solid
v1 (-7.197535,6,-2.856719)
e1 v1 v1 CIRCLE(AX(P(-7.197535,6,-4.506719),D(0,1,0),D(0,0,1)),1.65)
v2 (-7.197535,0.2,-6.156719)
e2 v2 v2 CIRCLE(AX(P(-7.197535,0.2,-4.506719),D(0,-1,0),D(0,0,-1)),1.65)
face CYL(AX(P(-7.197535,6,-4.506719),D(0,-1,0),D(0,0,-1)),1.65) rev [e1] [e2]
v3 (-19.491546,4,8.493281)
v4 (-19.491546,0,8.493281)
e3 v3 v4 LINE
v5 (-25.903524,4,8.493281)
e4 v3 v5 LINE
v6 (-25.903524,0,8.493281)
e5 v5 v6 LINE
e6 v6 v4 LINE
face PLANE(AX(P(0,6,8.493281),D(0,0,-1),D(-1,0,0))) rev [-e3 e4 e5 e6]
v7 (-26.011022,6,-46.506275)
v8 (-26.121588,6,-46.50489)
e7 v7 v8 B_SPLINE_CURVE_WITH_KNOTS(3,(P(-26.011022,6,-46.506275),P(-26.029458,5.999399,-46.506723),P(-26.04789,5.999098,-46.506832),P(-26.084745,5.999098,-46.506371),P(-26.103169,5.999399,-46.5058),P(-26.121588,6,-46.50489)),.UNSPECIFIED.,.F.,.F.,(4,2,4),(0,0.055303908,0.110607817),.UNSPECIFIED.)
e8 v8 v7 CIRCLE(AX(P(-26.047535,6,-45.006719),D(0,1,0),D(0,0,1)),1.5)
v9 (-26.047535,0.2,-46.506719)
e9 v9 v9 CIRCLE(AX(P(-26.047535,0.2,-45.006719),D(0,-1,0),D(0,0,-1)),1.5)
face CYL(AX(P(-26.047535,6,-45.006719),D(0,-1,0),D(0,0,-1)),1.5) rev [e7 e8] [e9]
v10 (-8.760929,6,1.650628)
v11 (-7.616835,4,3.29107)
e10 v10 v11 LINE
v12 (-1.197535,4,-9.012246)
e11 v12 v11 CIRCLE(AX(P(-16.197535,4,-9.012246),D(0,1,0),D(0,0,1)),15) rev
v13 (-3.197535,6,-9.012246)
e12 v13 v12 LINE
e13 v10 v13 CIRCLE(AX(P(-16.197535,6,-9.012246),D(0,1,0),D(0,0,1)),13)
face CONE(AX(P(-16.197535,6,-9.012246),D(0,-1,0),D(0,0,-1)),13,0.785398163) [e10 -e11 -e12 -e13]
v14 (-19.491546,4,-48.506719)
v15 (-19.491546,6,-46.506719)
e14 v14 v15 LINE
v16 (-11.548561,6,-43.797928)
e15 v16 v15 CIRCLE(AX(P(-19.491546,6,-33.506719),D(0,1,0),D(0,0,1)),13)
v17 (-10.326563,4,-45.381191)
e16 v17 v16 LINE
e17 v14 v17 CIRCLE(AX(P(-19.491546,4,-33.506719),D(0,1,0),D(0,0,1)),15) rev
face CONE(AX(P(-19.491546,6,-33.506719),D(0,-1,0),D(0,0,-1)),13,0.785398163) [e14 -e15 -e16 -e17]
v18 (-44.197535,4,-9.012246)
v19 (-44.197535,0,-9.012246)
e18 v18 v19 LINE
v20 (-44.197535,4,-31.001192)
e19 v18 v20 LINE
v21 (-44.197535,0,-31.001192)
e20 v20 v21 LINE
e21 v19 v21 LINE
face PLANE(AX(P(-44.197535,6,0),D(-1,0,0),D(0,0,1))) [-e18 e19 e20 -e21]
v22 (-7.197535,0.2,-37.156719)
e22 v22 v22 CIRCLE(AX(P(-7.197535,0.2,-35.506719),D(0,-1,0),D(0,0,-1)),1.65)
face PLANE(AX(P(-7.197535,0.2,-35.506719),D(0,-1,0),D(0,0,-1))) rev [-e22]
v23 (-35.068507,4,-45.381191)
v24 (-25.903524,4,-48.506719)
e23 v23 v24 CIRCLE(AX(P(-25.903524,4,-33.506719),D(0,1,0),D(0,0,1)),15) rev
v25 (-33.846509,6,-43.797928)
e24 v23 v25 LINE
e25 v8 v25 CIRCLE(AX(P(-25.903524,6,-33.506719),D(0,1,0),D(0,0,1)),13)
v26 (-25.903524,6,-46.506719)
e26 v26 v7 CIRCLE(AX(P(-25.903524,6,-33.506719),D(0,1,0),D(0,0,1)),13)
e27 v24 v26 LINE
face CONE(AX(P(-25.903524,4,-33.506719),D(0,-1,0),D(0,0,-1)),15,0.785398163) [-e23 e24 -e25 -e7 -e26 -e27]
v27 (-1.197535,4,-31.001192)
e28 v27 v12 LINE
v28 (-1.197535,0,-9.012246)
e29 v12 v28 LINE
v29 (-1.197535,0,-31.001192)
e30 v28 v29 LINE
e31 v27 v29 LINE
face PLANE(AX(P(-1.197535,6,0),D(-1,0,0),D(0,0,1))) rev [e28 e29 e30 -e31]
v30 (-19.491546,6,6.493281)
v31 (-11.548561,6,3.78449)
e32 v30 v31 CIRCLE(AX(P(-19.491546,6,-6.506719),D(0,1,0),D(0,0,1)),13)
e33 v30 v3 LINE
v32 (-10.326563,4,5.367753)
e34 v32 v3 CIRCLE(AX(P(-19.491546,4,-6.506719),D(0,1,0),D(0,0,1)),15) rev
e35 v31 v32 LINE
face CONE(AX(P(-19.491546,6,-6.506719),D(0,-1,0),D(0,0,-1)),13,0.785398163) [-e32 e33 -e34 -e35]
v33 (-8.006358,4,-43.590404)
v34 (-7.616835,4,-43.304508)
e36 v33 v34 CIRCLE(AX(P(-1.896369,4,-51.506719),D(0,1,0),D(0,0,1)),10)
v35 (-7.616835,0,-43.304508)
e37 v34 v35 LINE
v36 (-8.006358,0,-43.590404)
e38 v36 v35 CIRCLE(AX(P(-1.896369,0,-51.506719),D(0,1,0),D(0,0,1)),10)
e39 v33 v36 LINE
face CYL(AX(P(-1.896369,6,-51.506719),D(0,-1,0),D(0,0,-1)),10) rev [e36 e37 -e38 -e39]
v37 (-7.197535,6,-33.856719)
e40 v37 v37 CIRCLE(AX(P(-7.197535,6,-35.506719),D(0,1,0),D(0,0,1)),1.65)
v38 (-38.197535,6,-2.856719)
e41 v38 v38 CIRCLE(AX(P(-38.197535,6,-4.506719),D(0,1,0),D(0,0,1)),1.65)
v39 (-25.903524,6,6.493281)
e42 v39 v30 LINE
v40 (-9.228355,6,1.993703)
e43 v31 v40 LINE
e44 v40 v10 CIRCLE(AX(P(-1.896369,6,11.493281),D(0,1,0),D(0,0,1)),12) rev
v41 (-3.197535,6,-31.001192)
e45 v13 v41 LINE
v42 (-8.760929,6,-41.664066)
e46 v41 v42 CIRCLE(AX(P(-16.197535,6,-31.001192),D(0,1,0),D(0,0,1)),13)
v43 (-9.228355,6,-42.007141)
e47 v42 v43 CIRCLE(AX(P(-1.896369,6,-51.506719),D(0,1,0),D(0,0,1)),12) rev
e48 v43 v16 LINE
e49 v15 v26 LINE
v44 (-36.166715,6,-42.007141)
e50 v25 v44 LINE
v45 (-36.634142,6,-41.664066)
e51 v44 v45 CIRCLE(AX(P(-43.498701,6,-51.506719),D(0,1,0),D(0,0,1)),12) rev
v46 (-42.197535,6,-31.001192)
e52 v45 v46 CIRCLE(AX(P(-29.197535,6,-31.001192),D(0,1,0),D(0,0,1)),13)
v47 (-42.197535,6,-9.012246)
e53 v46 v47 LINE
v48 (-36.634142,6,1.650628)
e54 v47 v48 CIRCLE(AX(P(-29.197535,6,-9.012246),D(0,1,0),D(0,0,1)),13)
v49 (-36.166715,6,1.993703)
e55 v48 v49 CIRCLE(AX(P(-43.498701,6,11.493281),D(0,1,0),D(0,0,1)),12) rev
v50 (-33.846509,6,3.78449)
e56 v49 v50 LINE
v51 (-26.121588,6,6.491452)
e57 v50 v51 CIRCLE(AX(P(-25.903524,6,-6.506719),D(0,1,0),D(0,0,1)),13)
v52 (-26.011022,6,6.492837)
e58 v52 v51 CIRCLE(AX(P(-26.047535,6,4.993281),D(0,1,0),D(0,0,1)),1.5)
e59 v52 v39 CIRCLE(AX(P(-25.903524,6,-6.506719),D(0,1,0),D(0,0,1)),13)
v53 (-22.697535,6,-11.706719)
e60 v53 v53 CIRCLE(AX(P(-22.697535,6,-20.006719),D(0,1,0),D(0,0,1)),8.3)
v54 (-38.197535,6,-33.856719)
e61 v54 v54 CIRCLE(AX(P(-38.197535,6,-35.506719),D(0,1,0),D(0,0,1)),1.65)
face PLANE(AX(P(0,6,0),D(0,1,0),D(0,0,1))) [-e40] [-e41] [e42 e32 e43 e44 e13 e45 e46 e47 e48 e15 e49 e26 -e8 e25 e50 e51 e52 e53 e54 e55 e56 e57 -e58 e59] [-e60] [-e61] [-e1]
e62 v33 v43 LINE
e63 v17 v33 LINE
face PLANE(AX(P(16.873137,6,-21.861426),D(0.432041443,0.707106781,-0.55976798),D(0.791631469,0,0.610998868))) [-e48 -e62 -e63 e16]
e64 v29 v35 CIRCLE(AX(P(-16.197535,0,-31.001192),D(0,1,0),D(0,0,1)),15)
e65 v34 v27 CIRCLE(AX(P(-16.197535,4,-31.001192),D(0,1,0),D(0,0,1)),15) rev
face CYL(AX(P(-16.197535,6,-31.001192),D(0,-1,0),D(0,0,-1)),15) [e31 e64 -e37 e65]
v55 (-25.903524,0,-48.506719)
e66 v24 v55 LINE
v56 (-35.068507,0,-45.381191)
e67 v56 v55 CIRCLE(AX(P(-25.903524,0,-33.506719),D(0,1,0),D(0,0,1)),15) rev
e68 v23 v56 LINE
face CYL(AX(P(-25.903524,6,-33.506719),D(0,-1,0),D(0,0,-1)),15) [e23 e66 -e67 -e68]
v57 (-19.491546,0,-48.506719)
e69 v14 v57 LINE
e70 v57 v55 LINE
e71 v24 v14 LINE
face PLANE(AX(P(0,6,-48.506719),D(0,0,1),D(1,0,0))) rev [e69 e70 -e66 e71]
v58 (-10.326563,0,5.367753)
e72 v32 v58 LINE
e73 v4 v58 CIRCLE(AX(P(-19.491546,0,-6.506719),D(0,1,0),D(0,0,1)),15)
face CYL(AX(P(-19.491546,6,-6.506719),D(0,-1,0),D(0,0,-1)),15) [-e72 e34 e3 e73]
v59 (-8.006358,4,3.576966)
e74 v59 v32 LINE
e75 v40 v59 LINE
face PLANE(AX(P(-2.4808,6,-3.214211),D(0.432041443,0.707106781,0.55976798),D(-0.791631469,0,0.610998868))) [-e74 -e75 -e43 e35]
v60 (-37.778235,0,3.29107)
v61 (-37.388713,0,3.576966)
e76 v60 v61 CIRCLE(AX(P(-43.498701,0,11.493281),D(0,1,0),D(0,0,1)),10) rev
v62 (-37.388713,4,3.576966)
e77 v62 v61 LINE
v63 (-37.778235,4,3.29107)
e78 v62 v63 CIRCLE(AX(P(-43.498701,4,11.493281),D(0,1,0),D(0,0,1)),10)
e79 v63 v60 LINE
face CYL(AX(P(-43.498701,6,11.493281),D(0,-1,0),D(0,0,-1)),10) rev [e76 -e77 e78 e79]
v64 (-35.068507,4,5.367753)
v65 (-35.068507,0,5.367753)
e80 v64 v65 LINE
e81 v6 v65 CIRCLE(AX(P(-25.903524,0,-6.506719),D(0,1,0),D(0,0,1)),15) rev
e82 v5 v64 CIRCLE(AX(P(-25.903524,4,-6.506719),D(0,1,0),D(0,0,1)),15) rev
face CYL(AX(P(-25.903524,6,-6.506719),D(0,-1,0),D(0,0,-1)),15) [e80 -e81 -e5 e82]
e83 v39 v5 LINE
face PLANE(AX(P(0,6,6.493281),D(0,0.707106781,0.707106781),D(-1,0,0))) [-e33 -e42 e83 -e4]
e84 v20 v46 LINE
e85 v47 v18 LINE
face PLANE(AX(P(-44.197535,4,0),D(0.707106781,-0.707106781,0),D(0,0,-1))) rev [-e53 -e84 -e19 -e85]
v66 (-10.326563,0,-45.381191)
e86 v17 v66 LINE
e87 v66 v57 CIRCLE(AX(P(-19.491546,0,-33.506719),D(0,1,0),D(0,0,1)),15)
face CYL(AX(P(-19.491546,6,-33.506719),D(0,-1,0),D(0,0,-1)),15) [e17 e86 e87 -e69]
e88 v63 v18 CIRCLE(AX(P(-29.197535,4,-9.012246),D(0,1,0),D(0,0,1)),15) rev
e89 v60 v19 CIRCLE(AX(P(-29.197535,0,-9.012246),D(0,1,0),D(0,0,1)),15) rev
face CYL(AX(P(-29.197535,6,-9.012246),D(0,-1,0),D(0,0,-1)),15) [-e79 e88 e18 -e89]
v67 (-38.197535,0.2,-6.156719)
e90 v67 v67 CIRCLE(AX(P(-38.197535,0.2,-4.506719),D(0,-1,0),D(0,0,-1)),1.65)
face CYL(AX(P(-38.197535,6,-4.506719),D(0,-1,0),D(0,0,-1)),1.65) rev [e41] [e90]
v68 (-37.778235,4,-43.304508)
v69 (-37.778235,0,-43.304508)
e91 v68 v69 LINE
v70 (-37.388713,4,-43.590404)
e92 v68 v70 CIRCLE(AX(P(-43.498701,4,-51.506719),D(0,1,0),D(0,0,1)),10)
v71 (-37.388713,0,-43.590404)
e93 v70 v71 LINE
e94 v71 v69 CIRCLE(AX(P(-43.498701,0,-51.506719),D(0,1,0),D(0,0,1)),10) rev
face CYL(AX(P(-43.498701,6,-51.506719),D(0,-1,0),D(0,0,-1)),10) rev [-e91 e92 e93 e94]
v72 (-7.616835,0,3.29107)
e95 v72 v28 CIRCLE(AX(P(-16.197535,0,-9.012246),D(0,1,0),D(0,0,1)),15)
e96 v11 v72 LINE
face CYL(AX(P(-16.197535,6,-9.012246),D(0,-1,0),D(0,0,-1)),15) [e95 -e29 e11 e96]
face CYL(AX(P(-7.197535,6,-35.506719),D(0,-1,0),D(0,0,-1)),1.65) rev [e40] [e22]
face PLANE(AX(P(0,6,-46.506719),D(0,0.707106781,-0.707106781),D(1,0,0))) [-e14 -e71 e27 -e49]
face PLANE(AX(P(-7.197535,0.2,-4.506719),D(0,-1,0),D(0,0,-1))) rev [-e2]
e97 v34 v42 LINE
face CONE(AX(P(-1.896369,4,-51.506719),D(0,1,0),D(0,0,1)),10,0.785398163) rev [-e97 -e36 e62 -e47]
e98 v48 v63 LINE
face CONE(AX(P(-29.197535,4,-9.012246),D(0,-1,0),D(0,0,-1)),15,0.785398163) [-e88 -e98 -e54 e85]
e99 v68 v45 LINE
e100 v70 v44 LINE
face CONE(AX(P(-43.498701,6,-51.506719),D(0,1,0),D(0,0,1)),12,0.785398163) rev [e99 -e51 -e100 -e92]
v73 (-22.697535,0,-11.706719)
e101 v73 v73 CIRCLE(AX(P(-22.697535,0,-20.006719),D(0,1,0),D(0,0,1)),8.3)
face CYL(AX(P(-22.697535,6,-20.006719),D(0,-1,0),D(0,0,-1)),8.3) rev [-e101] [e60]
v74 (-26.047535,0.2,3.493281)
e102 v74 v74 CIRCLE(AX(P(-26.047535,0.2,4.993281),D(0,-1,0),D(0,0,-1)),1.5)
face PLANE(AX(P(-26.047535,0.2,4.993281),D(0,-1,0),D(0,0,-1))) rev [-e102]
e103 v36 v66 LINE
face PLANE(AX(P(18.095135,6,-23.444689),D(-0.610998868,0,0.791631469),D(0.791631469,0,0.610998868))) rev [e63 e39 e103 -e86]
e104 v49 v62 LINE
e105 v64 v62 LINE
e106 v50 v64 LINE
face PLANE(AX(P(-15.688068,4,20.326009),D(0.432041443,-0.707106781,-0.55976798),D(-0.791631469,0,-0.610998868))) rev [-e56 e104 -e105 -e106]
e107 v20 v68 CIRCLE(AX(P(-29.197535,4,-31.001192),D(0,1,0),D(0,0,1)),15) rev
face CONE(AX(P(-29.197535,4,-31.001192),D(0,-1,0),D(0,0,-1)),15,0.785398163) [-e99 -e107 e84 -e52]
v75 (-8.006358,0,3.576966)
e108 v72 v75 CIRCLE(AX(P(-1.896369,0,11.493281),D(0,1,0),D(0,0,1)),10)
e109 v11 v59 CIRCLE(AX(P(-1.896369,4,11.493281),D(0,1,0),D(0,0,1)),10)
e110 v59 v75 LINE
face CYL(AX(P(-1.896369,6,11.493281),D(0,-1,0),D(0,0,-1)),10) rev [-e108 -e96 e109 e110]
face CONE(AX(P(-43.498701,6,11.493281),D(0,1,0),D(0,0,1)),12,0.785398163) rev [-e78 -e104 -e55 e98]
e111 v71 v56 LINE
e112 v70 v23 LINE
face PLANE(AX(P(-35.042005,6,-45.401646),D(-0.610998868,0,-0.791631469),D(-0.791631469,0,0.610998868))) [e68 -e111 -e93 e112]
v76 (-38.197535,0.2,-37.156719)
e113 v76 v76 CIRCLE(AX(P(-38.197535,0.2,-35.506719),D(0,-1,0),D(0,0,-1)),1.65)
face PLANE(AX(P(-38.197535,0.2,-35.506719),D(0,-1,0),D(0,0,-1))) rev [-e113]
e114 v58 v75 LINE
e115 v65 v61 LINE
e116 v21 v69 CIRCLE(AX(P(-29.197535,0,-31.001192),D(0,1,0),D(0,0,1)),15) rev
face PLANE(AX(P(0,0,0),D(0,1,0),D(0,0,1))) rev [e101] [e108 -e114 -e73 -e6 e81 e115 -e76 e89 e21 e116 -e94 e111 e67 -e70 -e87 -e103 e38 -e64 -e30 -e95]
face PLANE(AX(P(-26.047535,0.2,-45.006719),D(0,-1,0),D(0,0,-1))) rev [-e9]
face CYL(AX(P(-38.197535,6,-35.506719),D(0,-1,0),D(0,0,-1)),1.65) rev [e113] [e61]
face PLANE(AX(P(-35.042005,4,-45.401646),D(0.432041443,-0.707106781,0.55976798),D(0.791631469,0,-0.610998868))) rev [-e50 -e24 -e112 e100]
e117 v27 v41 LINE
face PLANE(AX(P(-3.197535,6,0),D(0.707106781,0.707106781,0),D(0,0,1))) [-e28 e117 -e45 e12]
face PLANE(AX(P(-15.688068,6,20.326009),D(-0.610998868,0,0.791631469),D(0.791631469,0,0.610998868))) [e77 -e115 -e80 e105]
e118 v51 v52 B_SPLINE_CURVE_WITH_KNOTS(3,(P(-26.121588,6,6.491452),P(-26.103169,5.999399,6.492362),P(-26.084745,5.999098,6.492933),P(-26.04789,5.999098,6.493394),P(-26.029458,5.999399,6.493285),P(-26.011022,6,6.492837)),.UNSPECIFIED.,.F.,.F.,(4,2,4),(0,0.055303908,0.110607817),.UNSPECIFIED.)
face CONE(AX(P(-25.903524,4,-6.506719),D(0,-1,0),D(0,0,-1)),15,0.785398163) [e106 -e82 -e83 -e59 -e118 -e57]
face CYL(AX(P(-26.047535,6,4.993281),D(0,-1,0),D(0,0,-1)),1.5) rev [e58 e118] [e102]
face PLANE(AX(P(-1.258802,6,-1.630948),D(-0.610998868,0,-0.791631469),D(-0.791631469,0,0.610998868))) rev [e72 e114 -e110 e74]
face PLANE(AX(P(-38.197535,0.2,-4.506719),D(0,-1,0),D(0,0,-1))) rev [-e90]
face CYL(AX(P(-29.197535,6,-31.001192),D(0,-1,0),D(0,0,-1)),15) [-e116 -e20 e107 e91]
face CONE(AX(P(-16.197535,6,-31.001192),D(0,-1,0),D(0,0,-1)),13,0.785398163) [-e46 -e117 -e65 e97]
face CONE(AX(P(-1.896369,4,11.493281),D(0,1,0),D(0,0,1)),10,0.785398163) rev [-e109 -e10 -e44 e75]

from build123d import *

# Parameters (mm, degrees)
SZKIC1_R                    = 1.65
SZKIC1_R_2                  = 1.5
SZKIC1_R_3                  = 8.3
DODANIE_WYCI_GNI_CIE1_DEPTH = 6
SFAZOWANIE1_SIZE            = 2
SZKIC2_R                    = 1.65
SZKIC2_R_2                  = 1.5
DODANIE_WYCI_GNI_CIE2_DEPTH = 0.2


with BuildPart() as part:
    # Szkic1 → Dodanie-wyciągnięcie1 (new body)
    with BuildSketch(Plane(origin=(0, 0, 0), x_dir=(1, 0, 0), z_dir=(0, 1, 0))):
        with BuildLine():
            Line((-25.903523773, -8.493281025), (-19.491546416, -8.493281025))
            ThreePointArc((-19.491546416, -8.493281025), (-14.649908292, -7.690412435), (-10.326563391, -5.367753061))
            Line((-10.326563391, -5.367753061), (-8.006357575, -3.576966334))
            ThreePointArc((-8.006357575, -3.576966334), (-7.813323472, -3.431665275), (-7.616835373, -3.29107015))
            ThreePointArc((-7.616835373, -3.29107015), (-2.898841628, 2.073604214), (-1.197535095, 9.012246163))
            Line((-1.197535095, 9.012246163), (-1.197535095, 31.001191788))
            ThreePointArc((-1.197535095, 31.001191788), (-2.898841628, 37.939833736), (-7.616835373, 43.3045081))
            ThreePointArc((-7.616835373, 43.3045081), (-7.813323472, 43.445103226), (-8.006357575, 43.590404284))
            Line((-8.006357575, 43.590404284), (-10.326563391, 45.381191012))
            ThreePointArc((-10.326563391, 45.381191012), (-14.649908292, 47.703850385), (-19.491546416, 48.506718975))
            Line((-19.491546416, 48.506718975), (-25.903523773, 48.506718975))
            ThreePointArc((-25.903523773, 48.506718975), (-30.745161897, 47.703850385), (-35.068506799, 45.381191012))
            Line((-35.068506799, 45.381191012), (-37.388712614, 43.590404284))
            ThreePointArc((-37.388712614, 43.590404284), (-37.581746717, 43.445103226), (-37.778234817, 43.3045081))
            ThreePointArc((-37.778234817, 43.3045081), (-42.496228561, 37.939833736), (-44.197535095, 31.001191788))
            Line((-44.197535095, 31.001191788), (-44.197535095, 9.012246163))
            ThreePointArc((-44.197535095, 9.012246163), (-42.496228561, 2.073604214), (-37.778234817, -3.29107015))
            ThreePointArc((-37.778234817, -3.29107015), (-37.581746717, -3.431665275), (-37.388712614, -3.576966334))
            Line((-37.388712614, -3.576966334), (-35.068506799, -5.367753061))
            ThreePointArc((-35.068506799, -5.367753061), (-30.745161897, -7.690412435), (-25.903523773, -8.493281025))
        make_face()
        with Locations(Location((-38.197535095, 35.506718975, 0), (0, 0, 270))):
            Circle(SZKIC1_R, mode=Mode.SUBTRACT)
        with Locations(Location((-26.047535095, 45.006718975, 0), (0, 0, 270))):
            Circle(SZKIC1_R_2, mode=Mode.SUBTRACT)
        with Locations(Location((-7.197535095, 35.506718975, 0), (0, 0, 270))):
            Circle(SZKIC1_R, mode=Mode.SUBTRACT)
        with Locations(Location((-38.197535095, 4.506718975, 0), (0, 0, 270))):
            Circle(SZKIC1_R, mode=Mode.SUBTRACT)
        with Locations(Location((-26.047535095, -4.993281025, 0), (0, 0, 270))):
            Circle(SZKIC1_R_2, mode=Mode.SUBTRACT)
        with Locations(Location((-7.197535095, 4.506718975, 0), (0, 0, 270))):
            Circle(SZKIC1_R, mode=Mode.SUBTRACT)
        with Locations(Location((-22.697535095, 20.006718975, 0), (0, 0, 270))):
            Circle(SZKIC1_R_3, mode=Mode.SUBTRACT)
    extrude(amount=DODANIE_WYCI_GNI_CIE1_DEPTH)

    # Sfazowanie1
    # the kernel refuses this chamfer: 2 mm, written as the material it takes off along each edge
    with BuildSketch(Plane(origin=(-19.491546416, 6, -33.506718975), x_dir=(0.6109988683682814, 0, -0.791631469089424), z_dir=(0.791631469089424, 0, 0.6109988683682814))) as sfazowanie1_piece_1:
        Polygon((15, -SFAZOWANIE1_SIZE), (15 - SFAZOWANIE1_SIZE, 0), (15, 0), align=None)
    revolve(axis=Axis((-19.491546416, 6, -33.506718975), (0, 1, 0)), revolution_arc=37.661762745, mode=Mode.SUBTRACT)
    with BuildSketch(Plane(origin=(-19.491546416, 6, -48.506718975), x_dir=(0, -0.9996219169112968, -0.02749587661058563), z_dir=(-1, 0, 0)), Plane(origin=(-25.903523773, 6, 8.493281025), x_dir=(0, -0.9996219169112968, 0.027495876610586487), z_dir=(1, 0, 0))) as sfazowanie1_piece_2:
        Polygon((SFAZOWANIE1_SIZE * 0.999621916911, SFAZOWANIE1_SIZE * 0.0274958766106), (-SFAZOWANIE1_SIZE * 0.0274958766106, SFAZOWANIE1_SIZE * 0.999621916911), (0, 0), align=None)
    extrude(amount=6.411977357, mode=Mode.SUBTRACT)
    with BuildSketch(Plane(origin=(-25.903523773, 6, -33.506718975), x_dir=(0, 0, -1), z_dir=(1, 0, 0))) as sfazowanie1_piece_3:
        Polygon((15, -SFAZOWANIE1_SIZE), (15 - SFAZOWANIE1_SIZE, 0), (15, 0), align=None)
    revolve(axis=Axis((-25.903523773, 6, -33.506718975), (0, 1, 0)), revolution_arc=37.661762745, mode=Mode.SUBTRACT)
    with BuildSketch(Plane(origin=(-35.068506799, 6, -45.381191012), x_dir=(-0.01679994949386156, -0.9996219169112968, -0.021766601195139172), z_dir=(-0.7916314690894233, 0, 0.6109988683682824)), Plane(origin=(-37.388712614, 6, 3.576966334), x_dir=(-0.01679994949386157, -0.9996219169112968, 0.02176660119513917), z_dir=(0.791631469089423, 0, 0.6109988683682828)), Plane(origin=(-10.326563391, 6, 5.367753061), x_dir=(0.016799949493862203, -0.9996219169112968, 0.021766601195140015), z_dir=(0.7916314690894233, 0, -0.6109988683682822)), Plane(origin=(-8.006357575, 6, -43.590404284), x_dir=(0.01679994949386218, -0.9996219169112968, -0.02176660119514003), z_dir=(-0.791631469089424, 0, -0.6109988683682814))) as sfazowanie1_piece_4:
        Polygon((SFAZOWANIE1_SIZE * 0.999621916911, SFAZOWANIE1_SIZE * 0.0274958766106), (-SFAZOWANIE1_SIZE * 0.0274958766106, SFAZOWANIE1_SIZE * 0.999621916911), (0, 0), align=None)
    extrude(amount=2.930916602, mode=Mode.SUBTRACT)
    with BuildSketch(Plane(origin=(-43.498701298, 6, -51.506718975), x_dir=(0.6109988683682784, 0, 0.7916314690894262), z_dir=(0.7916314690894262, 0, -0.6109988683682784))) as sfazowanie1_piece_5:
        Polygon((10, SFAZOWANIE1_SIZE), (10 + SFAZOWANIE1_SIZE, 0), (10, 0), align=None)
    revolve(axis=Axis((-43.498701298, 6, -51.506718975), (0, -1, 0)), revolution_arc=2.76869433, mode=Mode.SUBTRACT)
    with BuildSketch(Plane(origin=(-29.197535095, 6, -31.001191788), x_dir=(-0.5720466481227963, 0, -0.820221087494996), z_dir=(0.820221087494996, 0, -0.5720466481227963))) as sfazowanie1_piece_6:
        Polygon((15, -SFAZOWANIE1_SIZE), (15 - SFAZOWANIE1_SIZE, 0), (15, 0), align=None)
    revolve(axis=Axis((-29.197535095, 6, -31.001191788), (0, 1, 0)), revolution_arc=55.106931585, mode=Mode.SUBTRACT)
    with BuildSketch(Plane(origin=(-44.197535095, 6, -31.001191788), x_dir=(-0.02749587661058563, -0.9996219169112968, 0), z_dir=(0, 0, 1)), Plane(origin=(-1.197535095, 6, -9.012246163), x_dir=(0.027495876610586382, -0.9996219169112968, 0), z_dir=(0, 0, -1))) as sfazowanie1_piece_7:
        Polygon((SFAZOWANIE1_SIZE * 0.999621916911, SFAZOWANIE1_SIZE * 0.0274958766106), (-SFAZOWANIE1_SIZE * 0.0274958766106, SFAZOWANIE1_SIZE * 0.999621916911), (0, 0), align=None)
    extrude(amount=21.988945625, mode=Mode.SUBTRACT)
    with BuildSketch(Plane(origin=(-29.197535095, 6, -9.012246163), x_dir=(-1, 0, 0), z_dir=(0, 0, -1))) as sfazowanie1_piece_8:
        Polygon((15, -SFAZOWANIE1_SIZE), (15 - SFAZOWANIE1_SIZE, 0), (15, 0), align=None)
    revolve(axis=Axis((-29.197535095, 6, -9.012246163), (0, 1, 0)), revolution_arc=55.106931585, mode=Mode.SUBTRACT)
    with BuildSketch(Plane(origin=(-43.498701298, 6, 11.493281025), x_dir=(0.5720466481228126, 0, -0.8202210874949846), z_dir=(-0.8202210874949846, 0, -0.5720466481228126))) as sfazowanie1_piece_9:
        Polygon((10, SFAZOWANIE1_SIZE), (10 + SFAZOWANIE1_SIZE, 0), (10, 0), align=None)
    revolve(axis=Axis((-43.498701298, 6, 11.493281025), (0, -1, 0)), revolution_arc=2.76869433, mode=Mode.SUBTRACT)
    with BuildSketch(Plane(origin=(-25.903523773, 6, -6.506718975), x_dir=(-0.6109988683682754, 0, 0.7916314690894285), z_dir=(-0.7916314690894285, 0, -0.6109988683682754))) as sfazowanie1_piece_10:
        Polygon((15, -SFAZOWANIE1_SIZE), (15 - SFAZOWANIE1_SIZE, 0), (15, 0), align=None)
    revolve(axis=Axis((-25.903523773, 6, -6.506718975), (0, 1, 0)), revolution_arc=37.661762745, mode=Mode.SUBTRACT)
    with BuildSketch(Plane(origin=(-19.491546416, 6, -6.506718975), x_dir=(0, 0, 1), z_dir=(-1, 0, 0))) as sfazowanie1_piece_11:
        Polygon((15, -SFAZOWANIE1_SIZE), (15 - SFAZOWANIE1_SIZE, 0), (15, 0), align=None)
    revolve(axis=Axis((-19.491546416, 6, -6.506718975), (0, 1, 0)), revolution_arc=37.661762745, mode=Mode.SUBTRACT)
    with BuildSketch(Plane(origin=(-1.896368892, 6, 11.493281025), x_dir=(-0.61099886836827, 0, -0.7916314690894327), z_dir=(-0.7916314690894327, 0, 0.61099886836827))) as sfazowanie1_piece_12:
        Polygon((10, SFAZOWANIE1_SIZE), (10 + SFAZOWANIE1_SIZE, 0), (10, 0), align=None)
    revolve(axis=Axis((-1.896368892, 6, 11.493281025), (0, -1, 0)), revolution_arc=2.76869433, mode=Mode.SUBTRACT)
    with BuildSketch(Plane(origin=(-16.197535095, 6, -9.012246163), x_dir=(0.5720466481227972, 0, 0.8202210874949952), z_dir=(-0.8202210874949952, 0, 0.5720466481227972))) as sfazowanie1_piece_13:
        Polygon((15, -SFAZOWANIE1_SIZE), (15 - SFAZOWANIE1_SIZE, 0), (15, 0), align=None)
    revolve(axis=Axis((-16.197535095, 6, -9.012246163), (0, 1, 0)), revolution_arc=55.106931585, mode=Mode.SUBTRACT)
    with BuildSketch(Plane(origin=(-16.197535095, 6, -31.001191788), x_dir=(1, 0, 0), z_dir=(0, 0, 1))) as sfazowanie1_piece_14:
        Polygon((15, -SFAZOWANIE1_SIZE), (15 - SFAZOWANIE1_SIZE, 0), (15, 0), align=None)
    revolve(axis=Axis((-16.197535095, 6, -31.001191788), (0, 1, 0)), revolution_arc=55.106931585, mode=Mode.SUBTRACT)
    with BuildSketch(Plane(origin=(-1.896368892, 6, -51.506718975), x_dir=(-0.5720466481227885, 0, 0.8202210874950013), z_dir=(0.8202210874950013, 0, 0.5720466481227885))) as sfazowanie1_piece_15:
        Polygon((10, SFAZOWANIE1_SIZE), (10 + SFAZOWANIE1_SIZE, 0), (10, 0), align=None)
    revolve(axis=Axis((-1.896368892, 6, -51.506718975), (0, -1, 0)), revolution_arc=2.76869433, mode=Mode.SUBTRACT)

    # Szkic2 → Dodanie-wyciągnięcie2 (add)
    with BuildSketch(Plane.XZ):
        with Locations(Location((-38.197535095, -35.506718975, 0), (0, 0, 270))):
            Circle(SZKIC2_R)
        with Locations(Location((-26.047535095, -45.006718975, 0), (0, 0, 270))):
            Circle(SZKIC2_R_2)
        with Locations(Location((-7.197535095, -35.506718975, 0), (0, 0, 270))):
            Circle(SZKIC2_R)
        with Locations(Location((-7.197535095, -4.506718975, 0), (0, 0, 270))):
            Circle(SZKIC2_R)
        with Locations(Location((-38.197535095, -4.506718975, 0), (0, 0, 270))):
            Circle(SZKIC2_R)
        with Locations(Location((-26.047535095, 4.993281025, 0), (0, 0, 270))):
            Circle(SZKIC2_R_2)
    extrude(amount=-DODANIE_WYCI_GNI_CIE2_DEPTH)


solid = part.part
